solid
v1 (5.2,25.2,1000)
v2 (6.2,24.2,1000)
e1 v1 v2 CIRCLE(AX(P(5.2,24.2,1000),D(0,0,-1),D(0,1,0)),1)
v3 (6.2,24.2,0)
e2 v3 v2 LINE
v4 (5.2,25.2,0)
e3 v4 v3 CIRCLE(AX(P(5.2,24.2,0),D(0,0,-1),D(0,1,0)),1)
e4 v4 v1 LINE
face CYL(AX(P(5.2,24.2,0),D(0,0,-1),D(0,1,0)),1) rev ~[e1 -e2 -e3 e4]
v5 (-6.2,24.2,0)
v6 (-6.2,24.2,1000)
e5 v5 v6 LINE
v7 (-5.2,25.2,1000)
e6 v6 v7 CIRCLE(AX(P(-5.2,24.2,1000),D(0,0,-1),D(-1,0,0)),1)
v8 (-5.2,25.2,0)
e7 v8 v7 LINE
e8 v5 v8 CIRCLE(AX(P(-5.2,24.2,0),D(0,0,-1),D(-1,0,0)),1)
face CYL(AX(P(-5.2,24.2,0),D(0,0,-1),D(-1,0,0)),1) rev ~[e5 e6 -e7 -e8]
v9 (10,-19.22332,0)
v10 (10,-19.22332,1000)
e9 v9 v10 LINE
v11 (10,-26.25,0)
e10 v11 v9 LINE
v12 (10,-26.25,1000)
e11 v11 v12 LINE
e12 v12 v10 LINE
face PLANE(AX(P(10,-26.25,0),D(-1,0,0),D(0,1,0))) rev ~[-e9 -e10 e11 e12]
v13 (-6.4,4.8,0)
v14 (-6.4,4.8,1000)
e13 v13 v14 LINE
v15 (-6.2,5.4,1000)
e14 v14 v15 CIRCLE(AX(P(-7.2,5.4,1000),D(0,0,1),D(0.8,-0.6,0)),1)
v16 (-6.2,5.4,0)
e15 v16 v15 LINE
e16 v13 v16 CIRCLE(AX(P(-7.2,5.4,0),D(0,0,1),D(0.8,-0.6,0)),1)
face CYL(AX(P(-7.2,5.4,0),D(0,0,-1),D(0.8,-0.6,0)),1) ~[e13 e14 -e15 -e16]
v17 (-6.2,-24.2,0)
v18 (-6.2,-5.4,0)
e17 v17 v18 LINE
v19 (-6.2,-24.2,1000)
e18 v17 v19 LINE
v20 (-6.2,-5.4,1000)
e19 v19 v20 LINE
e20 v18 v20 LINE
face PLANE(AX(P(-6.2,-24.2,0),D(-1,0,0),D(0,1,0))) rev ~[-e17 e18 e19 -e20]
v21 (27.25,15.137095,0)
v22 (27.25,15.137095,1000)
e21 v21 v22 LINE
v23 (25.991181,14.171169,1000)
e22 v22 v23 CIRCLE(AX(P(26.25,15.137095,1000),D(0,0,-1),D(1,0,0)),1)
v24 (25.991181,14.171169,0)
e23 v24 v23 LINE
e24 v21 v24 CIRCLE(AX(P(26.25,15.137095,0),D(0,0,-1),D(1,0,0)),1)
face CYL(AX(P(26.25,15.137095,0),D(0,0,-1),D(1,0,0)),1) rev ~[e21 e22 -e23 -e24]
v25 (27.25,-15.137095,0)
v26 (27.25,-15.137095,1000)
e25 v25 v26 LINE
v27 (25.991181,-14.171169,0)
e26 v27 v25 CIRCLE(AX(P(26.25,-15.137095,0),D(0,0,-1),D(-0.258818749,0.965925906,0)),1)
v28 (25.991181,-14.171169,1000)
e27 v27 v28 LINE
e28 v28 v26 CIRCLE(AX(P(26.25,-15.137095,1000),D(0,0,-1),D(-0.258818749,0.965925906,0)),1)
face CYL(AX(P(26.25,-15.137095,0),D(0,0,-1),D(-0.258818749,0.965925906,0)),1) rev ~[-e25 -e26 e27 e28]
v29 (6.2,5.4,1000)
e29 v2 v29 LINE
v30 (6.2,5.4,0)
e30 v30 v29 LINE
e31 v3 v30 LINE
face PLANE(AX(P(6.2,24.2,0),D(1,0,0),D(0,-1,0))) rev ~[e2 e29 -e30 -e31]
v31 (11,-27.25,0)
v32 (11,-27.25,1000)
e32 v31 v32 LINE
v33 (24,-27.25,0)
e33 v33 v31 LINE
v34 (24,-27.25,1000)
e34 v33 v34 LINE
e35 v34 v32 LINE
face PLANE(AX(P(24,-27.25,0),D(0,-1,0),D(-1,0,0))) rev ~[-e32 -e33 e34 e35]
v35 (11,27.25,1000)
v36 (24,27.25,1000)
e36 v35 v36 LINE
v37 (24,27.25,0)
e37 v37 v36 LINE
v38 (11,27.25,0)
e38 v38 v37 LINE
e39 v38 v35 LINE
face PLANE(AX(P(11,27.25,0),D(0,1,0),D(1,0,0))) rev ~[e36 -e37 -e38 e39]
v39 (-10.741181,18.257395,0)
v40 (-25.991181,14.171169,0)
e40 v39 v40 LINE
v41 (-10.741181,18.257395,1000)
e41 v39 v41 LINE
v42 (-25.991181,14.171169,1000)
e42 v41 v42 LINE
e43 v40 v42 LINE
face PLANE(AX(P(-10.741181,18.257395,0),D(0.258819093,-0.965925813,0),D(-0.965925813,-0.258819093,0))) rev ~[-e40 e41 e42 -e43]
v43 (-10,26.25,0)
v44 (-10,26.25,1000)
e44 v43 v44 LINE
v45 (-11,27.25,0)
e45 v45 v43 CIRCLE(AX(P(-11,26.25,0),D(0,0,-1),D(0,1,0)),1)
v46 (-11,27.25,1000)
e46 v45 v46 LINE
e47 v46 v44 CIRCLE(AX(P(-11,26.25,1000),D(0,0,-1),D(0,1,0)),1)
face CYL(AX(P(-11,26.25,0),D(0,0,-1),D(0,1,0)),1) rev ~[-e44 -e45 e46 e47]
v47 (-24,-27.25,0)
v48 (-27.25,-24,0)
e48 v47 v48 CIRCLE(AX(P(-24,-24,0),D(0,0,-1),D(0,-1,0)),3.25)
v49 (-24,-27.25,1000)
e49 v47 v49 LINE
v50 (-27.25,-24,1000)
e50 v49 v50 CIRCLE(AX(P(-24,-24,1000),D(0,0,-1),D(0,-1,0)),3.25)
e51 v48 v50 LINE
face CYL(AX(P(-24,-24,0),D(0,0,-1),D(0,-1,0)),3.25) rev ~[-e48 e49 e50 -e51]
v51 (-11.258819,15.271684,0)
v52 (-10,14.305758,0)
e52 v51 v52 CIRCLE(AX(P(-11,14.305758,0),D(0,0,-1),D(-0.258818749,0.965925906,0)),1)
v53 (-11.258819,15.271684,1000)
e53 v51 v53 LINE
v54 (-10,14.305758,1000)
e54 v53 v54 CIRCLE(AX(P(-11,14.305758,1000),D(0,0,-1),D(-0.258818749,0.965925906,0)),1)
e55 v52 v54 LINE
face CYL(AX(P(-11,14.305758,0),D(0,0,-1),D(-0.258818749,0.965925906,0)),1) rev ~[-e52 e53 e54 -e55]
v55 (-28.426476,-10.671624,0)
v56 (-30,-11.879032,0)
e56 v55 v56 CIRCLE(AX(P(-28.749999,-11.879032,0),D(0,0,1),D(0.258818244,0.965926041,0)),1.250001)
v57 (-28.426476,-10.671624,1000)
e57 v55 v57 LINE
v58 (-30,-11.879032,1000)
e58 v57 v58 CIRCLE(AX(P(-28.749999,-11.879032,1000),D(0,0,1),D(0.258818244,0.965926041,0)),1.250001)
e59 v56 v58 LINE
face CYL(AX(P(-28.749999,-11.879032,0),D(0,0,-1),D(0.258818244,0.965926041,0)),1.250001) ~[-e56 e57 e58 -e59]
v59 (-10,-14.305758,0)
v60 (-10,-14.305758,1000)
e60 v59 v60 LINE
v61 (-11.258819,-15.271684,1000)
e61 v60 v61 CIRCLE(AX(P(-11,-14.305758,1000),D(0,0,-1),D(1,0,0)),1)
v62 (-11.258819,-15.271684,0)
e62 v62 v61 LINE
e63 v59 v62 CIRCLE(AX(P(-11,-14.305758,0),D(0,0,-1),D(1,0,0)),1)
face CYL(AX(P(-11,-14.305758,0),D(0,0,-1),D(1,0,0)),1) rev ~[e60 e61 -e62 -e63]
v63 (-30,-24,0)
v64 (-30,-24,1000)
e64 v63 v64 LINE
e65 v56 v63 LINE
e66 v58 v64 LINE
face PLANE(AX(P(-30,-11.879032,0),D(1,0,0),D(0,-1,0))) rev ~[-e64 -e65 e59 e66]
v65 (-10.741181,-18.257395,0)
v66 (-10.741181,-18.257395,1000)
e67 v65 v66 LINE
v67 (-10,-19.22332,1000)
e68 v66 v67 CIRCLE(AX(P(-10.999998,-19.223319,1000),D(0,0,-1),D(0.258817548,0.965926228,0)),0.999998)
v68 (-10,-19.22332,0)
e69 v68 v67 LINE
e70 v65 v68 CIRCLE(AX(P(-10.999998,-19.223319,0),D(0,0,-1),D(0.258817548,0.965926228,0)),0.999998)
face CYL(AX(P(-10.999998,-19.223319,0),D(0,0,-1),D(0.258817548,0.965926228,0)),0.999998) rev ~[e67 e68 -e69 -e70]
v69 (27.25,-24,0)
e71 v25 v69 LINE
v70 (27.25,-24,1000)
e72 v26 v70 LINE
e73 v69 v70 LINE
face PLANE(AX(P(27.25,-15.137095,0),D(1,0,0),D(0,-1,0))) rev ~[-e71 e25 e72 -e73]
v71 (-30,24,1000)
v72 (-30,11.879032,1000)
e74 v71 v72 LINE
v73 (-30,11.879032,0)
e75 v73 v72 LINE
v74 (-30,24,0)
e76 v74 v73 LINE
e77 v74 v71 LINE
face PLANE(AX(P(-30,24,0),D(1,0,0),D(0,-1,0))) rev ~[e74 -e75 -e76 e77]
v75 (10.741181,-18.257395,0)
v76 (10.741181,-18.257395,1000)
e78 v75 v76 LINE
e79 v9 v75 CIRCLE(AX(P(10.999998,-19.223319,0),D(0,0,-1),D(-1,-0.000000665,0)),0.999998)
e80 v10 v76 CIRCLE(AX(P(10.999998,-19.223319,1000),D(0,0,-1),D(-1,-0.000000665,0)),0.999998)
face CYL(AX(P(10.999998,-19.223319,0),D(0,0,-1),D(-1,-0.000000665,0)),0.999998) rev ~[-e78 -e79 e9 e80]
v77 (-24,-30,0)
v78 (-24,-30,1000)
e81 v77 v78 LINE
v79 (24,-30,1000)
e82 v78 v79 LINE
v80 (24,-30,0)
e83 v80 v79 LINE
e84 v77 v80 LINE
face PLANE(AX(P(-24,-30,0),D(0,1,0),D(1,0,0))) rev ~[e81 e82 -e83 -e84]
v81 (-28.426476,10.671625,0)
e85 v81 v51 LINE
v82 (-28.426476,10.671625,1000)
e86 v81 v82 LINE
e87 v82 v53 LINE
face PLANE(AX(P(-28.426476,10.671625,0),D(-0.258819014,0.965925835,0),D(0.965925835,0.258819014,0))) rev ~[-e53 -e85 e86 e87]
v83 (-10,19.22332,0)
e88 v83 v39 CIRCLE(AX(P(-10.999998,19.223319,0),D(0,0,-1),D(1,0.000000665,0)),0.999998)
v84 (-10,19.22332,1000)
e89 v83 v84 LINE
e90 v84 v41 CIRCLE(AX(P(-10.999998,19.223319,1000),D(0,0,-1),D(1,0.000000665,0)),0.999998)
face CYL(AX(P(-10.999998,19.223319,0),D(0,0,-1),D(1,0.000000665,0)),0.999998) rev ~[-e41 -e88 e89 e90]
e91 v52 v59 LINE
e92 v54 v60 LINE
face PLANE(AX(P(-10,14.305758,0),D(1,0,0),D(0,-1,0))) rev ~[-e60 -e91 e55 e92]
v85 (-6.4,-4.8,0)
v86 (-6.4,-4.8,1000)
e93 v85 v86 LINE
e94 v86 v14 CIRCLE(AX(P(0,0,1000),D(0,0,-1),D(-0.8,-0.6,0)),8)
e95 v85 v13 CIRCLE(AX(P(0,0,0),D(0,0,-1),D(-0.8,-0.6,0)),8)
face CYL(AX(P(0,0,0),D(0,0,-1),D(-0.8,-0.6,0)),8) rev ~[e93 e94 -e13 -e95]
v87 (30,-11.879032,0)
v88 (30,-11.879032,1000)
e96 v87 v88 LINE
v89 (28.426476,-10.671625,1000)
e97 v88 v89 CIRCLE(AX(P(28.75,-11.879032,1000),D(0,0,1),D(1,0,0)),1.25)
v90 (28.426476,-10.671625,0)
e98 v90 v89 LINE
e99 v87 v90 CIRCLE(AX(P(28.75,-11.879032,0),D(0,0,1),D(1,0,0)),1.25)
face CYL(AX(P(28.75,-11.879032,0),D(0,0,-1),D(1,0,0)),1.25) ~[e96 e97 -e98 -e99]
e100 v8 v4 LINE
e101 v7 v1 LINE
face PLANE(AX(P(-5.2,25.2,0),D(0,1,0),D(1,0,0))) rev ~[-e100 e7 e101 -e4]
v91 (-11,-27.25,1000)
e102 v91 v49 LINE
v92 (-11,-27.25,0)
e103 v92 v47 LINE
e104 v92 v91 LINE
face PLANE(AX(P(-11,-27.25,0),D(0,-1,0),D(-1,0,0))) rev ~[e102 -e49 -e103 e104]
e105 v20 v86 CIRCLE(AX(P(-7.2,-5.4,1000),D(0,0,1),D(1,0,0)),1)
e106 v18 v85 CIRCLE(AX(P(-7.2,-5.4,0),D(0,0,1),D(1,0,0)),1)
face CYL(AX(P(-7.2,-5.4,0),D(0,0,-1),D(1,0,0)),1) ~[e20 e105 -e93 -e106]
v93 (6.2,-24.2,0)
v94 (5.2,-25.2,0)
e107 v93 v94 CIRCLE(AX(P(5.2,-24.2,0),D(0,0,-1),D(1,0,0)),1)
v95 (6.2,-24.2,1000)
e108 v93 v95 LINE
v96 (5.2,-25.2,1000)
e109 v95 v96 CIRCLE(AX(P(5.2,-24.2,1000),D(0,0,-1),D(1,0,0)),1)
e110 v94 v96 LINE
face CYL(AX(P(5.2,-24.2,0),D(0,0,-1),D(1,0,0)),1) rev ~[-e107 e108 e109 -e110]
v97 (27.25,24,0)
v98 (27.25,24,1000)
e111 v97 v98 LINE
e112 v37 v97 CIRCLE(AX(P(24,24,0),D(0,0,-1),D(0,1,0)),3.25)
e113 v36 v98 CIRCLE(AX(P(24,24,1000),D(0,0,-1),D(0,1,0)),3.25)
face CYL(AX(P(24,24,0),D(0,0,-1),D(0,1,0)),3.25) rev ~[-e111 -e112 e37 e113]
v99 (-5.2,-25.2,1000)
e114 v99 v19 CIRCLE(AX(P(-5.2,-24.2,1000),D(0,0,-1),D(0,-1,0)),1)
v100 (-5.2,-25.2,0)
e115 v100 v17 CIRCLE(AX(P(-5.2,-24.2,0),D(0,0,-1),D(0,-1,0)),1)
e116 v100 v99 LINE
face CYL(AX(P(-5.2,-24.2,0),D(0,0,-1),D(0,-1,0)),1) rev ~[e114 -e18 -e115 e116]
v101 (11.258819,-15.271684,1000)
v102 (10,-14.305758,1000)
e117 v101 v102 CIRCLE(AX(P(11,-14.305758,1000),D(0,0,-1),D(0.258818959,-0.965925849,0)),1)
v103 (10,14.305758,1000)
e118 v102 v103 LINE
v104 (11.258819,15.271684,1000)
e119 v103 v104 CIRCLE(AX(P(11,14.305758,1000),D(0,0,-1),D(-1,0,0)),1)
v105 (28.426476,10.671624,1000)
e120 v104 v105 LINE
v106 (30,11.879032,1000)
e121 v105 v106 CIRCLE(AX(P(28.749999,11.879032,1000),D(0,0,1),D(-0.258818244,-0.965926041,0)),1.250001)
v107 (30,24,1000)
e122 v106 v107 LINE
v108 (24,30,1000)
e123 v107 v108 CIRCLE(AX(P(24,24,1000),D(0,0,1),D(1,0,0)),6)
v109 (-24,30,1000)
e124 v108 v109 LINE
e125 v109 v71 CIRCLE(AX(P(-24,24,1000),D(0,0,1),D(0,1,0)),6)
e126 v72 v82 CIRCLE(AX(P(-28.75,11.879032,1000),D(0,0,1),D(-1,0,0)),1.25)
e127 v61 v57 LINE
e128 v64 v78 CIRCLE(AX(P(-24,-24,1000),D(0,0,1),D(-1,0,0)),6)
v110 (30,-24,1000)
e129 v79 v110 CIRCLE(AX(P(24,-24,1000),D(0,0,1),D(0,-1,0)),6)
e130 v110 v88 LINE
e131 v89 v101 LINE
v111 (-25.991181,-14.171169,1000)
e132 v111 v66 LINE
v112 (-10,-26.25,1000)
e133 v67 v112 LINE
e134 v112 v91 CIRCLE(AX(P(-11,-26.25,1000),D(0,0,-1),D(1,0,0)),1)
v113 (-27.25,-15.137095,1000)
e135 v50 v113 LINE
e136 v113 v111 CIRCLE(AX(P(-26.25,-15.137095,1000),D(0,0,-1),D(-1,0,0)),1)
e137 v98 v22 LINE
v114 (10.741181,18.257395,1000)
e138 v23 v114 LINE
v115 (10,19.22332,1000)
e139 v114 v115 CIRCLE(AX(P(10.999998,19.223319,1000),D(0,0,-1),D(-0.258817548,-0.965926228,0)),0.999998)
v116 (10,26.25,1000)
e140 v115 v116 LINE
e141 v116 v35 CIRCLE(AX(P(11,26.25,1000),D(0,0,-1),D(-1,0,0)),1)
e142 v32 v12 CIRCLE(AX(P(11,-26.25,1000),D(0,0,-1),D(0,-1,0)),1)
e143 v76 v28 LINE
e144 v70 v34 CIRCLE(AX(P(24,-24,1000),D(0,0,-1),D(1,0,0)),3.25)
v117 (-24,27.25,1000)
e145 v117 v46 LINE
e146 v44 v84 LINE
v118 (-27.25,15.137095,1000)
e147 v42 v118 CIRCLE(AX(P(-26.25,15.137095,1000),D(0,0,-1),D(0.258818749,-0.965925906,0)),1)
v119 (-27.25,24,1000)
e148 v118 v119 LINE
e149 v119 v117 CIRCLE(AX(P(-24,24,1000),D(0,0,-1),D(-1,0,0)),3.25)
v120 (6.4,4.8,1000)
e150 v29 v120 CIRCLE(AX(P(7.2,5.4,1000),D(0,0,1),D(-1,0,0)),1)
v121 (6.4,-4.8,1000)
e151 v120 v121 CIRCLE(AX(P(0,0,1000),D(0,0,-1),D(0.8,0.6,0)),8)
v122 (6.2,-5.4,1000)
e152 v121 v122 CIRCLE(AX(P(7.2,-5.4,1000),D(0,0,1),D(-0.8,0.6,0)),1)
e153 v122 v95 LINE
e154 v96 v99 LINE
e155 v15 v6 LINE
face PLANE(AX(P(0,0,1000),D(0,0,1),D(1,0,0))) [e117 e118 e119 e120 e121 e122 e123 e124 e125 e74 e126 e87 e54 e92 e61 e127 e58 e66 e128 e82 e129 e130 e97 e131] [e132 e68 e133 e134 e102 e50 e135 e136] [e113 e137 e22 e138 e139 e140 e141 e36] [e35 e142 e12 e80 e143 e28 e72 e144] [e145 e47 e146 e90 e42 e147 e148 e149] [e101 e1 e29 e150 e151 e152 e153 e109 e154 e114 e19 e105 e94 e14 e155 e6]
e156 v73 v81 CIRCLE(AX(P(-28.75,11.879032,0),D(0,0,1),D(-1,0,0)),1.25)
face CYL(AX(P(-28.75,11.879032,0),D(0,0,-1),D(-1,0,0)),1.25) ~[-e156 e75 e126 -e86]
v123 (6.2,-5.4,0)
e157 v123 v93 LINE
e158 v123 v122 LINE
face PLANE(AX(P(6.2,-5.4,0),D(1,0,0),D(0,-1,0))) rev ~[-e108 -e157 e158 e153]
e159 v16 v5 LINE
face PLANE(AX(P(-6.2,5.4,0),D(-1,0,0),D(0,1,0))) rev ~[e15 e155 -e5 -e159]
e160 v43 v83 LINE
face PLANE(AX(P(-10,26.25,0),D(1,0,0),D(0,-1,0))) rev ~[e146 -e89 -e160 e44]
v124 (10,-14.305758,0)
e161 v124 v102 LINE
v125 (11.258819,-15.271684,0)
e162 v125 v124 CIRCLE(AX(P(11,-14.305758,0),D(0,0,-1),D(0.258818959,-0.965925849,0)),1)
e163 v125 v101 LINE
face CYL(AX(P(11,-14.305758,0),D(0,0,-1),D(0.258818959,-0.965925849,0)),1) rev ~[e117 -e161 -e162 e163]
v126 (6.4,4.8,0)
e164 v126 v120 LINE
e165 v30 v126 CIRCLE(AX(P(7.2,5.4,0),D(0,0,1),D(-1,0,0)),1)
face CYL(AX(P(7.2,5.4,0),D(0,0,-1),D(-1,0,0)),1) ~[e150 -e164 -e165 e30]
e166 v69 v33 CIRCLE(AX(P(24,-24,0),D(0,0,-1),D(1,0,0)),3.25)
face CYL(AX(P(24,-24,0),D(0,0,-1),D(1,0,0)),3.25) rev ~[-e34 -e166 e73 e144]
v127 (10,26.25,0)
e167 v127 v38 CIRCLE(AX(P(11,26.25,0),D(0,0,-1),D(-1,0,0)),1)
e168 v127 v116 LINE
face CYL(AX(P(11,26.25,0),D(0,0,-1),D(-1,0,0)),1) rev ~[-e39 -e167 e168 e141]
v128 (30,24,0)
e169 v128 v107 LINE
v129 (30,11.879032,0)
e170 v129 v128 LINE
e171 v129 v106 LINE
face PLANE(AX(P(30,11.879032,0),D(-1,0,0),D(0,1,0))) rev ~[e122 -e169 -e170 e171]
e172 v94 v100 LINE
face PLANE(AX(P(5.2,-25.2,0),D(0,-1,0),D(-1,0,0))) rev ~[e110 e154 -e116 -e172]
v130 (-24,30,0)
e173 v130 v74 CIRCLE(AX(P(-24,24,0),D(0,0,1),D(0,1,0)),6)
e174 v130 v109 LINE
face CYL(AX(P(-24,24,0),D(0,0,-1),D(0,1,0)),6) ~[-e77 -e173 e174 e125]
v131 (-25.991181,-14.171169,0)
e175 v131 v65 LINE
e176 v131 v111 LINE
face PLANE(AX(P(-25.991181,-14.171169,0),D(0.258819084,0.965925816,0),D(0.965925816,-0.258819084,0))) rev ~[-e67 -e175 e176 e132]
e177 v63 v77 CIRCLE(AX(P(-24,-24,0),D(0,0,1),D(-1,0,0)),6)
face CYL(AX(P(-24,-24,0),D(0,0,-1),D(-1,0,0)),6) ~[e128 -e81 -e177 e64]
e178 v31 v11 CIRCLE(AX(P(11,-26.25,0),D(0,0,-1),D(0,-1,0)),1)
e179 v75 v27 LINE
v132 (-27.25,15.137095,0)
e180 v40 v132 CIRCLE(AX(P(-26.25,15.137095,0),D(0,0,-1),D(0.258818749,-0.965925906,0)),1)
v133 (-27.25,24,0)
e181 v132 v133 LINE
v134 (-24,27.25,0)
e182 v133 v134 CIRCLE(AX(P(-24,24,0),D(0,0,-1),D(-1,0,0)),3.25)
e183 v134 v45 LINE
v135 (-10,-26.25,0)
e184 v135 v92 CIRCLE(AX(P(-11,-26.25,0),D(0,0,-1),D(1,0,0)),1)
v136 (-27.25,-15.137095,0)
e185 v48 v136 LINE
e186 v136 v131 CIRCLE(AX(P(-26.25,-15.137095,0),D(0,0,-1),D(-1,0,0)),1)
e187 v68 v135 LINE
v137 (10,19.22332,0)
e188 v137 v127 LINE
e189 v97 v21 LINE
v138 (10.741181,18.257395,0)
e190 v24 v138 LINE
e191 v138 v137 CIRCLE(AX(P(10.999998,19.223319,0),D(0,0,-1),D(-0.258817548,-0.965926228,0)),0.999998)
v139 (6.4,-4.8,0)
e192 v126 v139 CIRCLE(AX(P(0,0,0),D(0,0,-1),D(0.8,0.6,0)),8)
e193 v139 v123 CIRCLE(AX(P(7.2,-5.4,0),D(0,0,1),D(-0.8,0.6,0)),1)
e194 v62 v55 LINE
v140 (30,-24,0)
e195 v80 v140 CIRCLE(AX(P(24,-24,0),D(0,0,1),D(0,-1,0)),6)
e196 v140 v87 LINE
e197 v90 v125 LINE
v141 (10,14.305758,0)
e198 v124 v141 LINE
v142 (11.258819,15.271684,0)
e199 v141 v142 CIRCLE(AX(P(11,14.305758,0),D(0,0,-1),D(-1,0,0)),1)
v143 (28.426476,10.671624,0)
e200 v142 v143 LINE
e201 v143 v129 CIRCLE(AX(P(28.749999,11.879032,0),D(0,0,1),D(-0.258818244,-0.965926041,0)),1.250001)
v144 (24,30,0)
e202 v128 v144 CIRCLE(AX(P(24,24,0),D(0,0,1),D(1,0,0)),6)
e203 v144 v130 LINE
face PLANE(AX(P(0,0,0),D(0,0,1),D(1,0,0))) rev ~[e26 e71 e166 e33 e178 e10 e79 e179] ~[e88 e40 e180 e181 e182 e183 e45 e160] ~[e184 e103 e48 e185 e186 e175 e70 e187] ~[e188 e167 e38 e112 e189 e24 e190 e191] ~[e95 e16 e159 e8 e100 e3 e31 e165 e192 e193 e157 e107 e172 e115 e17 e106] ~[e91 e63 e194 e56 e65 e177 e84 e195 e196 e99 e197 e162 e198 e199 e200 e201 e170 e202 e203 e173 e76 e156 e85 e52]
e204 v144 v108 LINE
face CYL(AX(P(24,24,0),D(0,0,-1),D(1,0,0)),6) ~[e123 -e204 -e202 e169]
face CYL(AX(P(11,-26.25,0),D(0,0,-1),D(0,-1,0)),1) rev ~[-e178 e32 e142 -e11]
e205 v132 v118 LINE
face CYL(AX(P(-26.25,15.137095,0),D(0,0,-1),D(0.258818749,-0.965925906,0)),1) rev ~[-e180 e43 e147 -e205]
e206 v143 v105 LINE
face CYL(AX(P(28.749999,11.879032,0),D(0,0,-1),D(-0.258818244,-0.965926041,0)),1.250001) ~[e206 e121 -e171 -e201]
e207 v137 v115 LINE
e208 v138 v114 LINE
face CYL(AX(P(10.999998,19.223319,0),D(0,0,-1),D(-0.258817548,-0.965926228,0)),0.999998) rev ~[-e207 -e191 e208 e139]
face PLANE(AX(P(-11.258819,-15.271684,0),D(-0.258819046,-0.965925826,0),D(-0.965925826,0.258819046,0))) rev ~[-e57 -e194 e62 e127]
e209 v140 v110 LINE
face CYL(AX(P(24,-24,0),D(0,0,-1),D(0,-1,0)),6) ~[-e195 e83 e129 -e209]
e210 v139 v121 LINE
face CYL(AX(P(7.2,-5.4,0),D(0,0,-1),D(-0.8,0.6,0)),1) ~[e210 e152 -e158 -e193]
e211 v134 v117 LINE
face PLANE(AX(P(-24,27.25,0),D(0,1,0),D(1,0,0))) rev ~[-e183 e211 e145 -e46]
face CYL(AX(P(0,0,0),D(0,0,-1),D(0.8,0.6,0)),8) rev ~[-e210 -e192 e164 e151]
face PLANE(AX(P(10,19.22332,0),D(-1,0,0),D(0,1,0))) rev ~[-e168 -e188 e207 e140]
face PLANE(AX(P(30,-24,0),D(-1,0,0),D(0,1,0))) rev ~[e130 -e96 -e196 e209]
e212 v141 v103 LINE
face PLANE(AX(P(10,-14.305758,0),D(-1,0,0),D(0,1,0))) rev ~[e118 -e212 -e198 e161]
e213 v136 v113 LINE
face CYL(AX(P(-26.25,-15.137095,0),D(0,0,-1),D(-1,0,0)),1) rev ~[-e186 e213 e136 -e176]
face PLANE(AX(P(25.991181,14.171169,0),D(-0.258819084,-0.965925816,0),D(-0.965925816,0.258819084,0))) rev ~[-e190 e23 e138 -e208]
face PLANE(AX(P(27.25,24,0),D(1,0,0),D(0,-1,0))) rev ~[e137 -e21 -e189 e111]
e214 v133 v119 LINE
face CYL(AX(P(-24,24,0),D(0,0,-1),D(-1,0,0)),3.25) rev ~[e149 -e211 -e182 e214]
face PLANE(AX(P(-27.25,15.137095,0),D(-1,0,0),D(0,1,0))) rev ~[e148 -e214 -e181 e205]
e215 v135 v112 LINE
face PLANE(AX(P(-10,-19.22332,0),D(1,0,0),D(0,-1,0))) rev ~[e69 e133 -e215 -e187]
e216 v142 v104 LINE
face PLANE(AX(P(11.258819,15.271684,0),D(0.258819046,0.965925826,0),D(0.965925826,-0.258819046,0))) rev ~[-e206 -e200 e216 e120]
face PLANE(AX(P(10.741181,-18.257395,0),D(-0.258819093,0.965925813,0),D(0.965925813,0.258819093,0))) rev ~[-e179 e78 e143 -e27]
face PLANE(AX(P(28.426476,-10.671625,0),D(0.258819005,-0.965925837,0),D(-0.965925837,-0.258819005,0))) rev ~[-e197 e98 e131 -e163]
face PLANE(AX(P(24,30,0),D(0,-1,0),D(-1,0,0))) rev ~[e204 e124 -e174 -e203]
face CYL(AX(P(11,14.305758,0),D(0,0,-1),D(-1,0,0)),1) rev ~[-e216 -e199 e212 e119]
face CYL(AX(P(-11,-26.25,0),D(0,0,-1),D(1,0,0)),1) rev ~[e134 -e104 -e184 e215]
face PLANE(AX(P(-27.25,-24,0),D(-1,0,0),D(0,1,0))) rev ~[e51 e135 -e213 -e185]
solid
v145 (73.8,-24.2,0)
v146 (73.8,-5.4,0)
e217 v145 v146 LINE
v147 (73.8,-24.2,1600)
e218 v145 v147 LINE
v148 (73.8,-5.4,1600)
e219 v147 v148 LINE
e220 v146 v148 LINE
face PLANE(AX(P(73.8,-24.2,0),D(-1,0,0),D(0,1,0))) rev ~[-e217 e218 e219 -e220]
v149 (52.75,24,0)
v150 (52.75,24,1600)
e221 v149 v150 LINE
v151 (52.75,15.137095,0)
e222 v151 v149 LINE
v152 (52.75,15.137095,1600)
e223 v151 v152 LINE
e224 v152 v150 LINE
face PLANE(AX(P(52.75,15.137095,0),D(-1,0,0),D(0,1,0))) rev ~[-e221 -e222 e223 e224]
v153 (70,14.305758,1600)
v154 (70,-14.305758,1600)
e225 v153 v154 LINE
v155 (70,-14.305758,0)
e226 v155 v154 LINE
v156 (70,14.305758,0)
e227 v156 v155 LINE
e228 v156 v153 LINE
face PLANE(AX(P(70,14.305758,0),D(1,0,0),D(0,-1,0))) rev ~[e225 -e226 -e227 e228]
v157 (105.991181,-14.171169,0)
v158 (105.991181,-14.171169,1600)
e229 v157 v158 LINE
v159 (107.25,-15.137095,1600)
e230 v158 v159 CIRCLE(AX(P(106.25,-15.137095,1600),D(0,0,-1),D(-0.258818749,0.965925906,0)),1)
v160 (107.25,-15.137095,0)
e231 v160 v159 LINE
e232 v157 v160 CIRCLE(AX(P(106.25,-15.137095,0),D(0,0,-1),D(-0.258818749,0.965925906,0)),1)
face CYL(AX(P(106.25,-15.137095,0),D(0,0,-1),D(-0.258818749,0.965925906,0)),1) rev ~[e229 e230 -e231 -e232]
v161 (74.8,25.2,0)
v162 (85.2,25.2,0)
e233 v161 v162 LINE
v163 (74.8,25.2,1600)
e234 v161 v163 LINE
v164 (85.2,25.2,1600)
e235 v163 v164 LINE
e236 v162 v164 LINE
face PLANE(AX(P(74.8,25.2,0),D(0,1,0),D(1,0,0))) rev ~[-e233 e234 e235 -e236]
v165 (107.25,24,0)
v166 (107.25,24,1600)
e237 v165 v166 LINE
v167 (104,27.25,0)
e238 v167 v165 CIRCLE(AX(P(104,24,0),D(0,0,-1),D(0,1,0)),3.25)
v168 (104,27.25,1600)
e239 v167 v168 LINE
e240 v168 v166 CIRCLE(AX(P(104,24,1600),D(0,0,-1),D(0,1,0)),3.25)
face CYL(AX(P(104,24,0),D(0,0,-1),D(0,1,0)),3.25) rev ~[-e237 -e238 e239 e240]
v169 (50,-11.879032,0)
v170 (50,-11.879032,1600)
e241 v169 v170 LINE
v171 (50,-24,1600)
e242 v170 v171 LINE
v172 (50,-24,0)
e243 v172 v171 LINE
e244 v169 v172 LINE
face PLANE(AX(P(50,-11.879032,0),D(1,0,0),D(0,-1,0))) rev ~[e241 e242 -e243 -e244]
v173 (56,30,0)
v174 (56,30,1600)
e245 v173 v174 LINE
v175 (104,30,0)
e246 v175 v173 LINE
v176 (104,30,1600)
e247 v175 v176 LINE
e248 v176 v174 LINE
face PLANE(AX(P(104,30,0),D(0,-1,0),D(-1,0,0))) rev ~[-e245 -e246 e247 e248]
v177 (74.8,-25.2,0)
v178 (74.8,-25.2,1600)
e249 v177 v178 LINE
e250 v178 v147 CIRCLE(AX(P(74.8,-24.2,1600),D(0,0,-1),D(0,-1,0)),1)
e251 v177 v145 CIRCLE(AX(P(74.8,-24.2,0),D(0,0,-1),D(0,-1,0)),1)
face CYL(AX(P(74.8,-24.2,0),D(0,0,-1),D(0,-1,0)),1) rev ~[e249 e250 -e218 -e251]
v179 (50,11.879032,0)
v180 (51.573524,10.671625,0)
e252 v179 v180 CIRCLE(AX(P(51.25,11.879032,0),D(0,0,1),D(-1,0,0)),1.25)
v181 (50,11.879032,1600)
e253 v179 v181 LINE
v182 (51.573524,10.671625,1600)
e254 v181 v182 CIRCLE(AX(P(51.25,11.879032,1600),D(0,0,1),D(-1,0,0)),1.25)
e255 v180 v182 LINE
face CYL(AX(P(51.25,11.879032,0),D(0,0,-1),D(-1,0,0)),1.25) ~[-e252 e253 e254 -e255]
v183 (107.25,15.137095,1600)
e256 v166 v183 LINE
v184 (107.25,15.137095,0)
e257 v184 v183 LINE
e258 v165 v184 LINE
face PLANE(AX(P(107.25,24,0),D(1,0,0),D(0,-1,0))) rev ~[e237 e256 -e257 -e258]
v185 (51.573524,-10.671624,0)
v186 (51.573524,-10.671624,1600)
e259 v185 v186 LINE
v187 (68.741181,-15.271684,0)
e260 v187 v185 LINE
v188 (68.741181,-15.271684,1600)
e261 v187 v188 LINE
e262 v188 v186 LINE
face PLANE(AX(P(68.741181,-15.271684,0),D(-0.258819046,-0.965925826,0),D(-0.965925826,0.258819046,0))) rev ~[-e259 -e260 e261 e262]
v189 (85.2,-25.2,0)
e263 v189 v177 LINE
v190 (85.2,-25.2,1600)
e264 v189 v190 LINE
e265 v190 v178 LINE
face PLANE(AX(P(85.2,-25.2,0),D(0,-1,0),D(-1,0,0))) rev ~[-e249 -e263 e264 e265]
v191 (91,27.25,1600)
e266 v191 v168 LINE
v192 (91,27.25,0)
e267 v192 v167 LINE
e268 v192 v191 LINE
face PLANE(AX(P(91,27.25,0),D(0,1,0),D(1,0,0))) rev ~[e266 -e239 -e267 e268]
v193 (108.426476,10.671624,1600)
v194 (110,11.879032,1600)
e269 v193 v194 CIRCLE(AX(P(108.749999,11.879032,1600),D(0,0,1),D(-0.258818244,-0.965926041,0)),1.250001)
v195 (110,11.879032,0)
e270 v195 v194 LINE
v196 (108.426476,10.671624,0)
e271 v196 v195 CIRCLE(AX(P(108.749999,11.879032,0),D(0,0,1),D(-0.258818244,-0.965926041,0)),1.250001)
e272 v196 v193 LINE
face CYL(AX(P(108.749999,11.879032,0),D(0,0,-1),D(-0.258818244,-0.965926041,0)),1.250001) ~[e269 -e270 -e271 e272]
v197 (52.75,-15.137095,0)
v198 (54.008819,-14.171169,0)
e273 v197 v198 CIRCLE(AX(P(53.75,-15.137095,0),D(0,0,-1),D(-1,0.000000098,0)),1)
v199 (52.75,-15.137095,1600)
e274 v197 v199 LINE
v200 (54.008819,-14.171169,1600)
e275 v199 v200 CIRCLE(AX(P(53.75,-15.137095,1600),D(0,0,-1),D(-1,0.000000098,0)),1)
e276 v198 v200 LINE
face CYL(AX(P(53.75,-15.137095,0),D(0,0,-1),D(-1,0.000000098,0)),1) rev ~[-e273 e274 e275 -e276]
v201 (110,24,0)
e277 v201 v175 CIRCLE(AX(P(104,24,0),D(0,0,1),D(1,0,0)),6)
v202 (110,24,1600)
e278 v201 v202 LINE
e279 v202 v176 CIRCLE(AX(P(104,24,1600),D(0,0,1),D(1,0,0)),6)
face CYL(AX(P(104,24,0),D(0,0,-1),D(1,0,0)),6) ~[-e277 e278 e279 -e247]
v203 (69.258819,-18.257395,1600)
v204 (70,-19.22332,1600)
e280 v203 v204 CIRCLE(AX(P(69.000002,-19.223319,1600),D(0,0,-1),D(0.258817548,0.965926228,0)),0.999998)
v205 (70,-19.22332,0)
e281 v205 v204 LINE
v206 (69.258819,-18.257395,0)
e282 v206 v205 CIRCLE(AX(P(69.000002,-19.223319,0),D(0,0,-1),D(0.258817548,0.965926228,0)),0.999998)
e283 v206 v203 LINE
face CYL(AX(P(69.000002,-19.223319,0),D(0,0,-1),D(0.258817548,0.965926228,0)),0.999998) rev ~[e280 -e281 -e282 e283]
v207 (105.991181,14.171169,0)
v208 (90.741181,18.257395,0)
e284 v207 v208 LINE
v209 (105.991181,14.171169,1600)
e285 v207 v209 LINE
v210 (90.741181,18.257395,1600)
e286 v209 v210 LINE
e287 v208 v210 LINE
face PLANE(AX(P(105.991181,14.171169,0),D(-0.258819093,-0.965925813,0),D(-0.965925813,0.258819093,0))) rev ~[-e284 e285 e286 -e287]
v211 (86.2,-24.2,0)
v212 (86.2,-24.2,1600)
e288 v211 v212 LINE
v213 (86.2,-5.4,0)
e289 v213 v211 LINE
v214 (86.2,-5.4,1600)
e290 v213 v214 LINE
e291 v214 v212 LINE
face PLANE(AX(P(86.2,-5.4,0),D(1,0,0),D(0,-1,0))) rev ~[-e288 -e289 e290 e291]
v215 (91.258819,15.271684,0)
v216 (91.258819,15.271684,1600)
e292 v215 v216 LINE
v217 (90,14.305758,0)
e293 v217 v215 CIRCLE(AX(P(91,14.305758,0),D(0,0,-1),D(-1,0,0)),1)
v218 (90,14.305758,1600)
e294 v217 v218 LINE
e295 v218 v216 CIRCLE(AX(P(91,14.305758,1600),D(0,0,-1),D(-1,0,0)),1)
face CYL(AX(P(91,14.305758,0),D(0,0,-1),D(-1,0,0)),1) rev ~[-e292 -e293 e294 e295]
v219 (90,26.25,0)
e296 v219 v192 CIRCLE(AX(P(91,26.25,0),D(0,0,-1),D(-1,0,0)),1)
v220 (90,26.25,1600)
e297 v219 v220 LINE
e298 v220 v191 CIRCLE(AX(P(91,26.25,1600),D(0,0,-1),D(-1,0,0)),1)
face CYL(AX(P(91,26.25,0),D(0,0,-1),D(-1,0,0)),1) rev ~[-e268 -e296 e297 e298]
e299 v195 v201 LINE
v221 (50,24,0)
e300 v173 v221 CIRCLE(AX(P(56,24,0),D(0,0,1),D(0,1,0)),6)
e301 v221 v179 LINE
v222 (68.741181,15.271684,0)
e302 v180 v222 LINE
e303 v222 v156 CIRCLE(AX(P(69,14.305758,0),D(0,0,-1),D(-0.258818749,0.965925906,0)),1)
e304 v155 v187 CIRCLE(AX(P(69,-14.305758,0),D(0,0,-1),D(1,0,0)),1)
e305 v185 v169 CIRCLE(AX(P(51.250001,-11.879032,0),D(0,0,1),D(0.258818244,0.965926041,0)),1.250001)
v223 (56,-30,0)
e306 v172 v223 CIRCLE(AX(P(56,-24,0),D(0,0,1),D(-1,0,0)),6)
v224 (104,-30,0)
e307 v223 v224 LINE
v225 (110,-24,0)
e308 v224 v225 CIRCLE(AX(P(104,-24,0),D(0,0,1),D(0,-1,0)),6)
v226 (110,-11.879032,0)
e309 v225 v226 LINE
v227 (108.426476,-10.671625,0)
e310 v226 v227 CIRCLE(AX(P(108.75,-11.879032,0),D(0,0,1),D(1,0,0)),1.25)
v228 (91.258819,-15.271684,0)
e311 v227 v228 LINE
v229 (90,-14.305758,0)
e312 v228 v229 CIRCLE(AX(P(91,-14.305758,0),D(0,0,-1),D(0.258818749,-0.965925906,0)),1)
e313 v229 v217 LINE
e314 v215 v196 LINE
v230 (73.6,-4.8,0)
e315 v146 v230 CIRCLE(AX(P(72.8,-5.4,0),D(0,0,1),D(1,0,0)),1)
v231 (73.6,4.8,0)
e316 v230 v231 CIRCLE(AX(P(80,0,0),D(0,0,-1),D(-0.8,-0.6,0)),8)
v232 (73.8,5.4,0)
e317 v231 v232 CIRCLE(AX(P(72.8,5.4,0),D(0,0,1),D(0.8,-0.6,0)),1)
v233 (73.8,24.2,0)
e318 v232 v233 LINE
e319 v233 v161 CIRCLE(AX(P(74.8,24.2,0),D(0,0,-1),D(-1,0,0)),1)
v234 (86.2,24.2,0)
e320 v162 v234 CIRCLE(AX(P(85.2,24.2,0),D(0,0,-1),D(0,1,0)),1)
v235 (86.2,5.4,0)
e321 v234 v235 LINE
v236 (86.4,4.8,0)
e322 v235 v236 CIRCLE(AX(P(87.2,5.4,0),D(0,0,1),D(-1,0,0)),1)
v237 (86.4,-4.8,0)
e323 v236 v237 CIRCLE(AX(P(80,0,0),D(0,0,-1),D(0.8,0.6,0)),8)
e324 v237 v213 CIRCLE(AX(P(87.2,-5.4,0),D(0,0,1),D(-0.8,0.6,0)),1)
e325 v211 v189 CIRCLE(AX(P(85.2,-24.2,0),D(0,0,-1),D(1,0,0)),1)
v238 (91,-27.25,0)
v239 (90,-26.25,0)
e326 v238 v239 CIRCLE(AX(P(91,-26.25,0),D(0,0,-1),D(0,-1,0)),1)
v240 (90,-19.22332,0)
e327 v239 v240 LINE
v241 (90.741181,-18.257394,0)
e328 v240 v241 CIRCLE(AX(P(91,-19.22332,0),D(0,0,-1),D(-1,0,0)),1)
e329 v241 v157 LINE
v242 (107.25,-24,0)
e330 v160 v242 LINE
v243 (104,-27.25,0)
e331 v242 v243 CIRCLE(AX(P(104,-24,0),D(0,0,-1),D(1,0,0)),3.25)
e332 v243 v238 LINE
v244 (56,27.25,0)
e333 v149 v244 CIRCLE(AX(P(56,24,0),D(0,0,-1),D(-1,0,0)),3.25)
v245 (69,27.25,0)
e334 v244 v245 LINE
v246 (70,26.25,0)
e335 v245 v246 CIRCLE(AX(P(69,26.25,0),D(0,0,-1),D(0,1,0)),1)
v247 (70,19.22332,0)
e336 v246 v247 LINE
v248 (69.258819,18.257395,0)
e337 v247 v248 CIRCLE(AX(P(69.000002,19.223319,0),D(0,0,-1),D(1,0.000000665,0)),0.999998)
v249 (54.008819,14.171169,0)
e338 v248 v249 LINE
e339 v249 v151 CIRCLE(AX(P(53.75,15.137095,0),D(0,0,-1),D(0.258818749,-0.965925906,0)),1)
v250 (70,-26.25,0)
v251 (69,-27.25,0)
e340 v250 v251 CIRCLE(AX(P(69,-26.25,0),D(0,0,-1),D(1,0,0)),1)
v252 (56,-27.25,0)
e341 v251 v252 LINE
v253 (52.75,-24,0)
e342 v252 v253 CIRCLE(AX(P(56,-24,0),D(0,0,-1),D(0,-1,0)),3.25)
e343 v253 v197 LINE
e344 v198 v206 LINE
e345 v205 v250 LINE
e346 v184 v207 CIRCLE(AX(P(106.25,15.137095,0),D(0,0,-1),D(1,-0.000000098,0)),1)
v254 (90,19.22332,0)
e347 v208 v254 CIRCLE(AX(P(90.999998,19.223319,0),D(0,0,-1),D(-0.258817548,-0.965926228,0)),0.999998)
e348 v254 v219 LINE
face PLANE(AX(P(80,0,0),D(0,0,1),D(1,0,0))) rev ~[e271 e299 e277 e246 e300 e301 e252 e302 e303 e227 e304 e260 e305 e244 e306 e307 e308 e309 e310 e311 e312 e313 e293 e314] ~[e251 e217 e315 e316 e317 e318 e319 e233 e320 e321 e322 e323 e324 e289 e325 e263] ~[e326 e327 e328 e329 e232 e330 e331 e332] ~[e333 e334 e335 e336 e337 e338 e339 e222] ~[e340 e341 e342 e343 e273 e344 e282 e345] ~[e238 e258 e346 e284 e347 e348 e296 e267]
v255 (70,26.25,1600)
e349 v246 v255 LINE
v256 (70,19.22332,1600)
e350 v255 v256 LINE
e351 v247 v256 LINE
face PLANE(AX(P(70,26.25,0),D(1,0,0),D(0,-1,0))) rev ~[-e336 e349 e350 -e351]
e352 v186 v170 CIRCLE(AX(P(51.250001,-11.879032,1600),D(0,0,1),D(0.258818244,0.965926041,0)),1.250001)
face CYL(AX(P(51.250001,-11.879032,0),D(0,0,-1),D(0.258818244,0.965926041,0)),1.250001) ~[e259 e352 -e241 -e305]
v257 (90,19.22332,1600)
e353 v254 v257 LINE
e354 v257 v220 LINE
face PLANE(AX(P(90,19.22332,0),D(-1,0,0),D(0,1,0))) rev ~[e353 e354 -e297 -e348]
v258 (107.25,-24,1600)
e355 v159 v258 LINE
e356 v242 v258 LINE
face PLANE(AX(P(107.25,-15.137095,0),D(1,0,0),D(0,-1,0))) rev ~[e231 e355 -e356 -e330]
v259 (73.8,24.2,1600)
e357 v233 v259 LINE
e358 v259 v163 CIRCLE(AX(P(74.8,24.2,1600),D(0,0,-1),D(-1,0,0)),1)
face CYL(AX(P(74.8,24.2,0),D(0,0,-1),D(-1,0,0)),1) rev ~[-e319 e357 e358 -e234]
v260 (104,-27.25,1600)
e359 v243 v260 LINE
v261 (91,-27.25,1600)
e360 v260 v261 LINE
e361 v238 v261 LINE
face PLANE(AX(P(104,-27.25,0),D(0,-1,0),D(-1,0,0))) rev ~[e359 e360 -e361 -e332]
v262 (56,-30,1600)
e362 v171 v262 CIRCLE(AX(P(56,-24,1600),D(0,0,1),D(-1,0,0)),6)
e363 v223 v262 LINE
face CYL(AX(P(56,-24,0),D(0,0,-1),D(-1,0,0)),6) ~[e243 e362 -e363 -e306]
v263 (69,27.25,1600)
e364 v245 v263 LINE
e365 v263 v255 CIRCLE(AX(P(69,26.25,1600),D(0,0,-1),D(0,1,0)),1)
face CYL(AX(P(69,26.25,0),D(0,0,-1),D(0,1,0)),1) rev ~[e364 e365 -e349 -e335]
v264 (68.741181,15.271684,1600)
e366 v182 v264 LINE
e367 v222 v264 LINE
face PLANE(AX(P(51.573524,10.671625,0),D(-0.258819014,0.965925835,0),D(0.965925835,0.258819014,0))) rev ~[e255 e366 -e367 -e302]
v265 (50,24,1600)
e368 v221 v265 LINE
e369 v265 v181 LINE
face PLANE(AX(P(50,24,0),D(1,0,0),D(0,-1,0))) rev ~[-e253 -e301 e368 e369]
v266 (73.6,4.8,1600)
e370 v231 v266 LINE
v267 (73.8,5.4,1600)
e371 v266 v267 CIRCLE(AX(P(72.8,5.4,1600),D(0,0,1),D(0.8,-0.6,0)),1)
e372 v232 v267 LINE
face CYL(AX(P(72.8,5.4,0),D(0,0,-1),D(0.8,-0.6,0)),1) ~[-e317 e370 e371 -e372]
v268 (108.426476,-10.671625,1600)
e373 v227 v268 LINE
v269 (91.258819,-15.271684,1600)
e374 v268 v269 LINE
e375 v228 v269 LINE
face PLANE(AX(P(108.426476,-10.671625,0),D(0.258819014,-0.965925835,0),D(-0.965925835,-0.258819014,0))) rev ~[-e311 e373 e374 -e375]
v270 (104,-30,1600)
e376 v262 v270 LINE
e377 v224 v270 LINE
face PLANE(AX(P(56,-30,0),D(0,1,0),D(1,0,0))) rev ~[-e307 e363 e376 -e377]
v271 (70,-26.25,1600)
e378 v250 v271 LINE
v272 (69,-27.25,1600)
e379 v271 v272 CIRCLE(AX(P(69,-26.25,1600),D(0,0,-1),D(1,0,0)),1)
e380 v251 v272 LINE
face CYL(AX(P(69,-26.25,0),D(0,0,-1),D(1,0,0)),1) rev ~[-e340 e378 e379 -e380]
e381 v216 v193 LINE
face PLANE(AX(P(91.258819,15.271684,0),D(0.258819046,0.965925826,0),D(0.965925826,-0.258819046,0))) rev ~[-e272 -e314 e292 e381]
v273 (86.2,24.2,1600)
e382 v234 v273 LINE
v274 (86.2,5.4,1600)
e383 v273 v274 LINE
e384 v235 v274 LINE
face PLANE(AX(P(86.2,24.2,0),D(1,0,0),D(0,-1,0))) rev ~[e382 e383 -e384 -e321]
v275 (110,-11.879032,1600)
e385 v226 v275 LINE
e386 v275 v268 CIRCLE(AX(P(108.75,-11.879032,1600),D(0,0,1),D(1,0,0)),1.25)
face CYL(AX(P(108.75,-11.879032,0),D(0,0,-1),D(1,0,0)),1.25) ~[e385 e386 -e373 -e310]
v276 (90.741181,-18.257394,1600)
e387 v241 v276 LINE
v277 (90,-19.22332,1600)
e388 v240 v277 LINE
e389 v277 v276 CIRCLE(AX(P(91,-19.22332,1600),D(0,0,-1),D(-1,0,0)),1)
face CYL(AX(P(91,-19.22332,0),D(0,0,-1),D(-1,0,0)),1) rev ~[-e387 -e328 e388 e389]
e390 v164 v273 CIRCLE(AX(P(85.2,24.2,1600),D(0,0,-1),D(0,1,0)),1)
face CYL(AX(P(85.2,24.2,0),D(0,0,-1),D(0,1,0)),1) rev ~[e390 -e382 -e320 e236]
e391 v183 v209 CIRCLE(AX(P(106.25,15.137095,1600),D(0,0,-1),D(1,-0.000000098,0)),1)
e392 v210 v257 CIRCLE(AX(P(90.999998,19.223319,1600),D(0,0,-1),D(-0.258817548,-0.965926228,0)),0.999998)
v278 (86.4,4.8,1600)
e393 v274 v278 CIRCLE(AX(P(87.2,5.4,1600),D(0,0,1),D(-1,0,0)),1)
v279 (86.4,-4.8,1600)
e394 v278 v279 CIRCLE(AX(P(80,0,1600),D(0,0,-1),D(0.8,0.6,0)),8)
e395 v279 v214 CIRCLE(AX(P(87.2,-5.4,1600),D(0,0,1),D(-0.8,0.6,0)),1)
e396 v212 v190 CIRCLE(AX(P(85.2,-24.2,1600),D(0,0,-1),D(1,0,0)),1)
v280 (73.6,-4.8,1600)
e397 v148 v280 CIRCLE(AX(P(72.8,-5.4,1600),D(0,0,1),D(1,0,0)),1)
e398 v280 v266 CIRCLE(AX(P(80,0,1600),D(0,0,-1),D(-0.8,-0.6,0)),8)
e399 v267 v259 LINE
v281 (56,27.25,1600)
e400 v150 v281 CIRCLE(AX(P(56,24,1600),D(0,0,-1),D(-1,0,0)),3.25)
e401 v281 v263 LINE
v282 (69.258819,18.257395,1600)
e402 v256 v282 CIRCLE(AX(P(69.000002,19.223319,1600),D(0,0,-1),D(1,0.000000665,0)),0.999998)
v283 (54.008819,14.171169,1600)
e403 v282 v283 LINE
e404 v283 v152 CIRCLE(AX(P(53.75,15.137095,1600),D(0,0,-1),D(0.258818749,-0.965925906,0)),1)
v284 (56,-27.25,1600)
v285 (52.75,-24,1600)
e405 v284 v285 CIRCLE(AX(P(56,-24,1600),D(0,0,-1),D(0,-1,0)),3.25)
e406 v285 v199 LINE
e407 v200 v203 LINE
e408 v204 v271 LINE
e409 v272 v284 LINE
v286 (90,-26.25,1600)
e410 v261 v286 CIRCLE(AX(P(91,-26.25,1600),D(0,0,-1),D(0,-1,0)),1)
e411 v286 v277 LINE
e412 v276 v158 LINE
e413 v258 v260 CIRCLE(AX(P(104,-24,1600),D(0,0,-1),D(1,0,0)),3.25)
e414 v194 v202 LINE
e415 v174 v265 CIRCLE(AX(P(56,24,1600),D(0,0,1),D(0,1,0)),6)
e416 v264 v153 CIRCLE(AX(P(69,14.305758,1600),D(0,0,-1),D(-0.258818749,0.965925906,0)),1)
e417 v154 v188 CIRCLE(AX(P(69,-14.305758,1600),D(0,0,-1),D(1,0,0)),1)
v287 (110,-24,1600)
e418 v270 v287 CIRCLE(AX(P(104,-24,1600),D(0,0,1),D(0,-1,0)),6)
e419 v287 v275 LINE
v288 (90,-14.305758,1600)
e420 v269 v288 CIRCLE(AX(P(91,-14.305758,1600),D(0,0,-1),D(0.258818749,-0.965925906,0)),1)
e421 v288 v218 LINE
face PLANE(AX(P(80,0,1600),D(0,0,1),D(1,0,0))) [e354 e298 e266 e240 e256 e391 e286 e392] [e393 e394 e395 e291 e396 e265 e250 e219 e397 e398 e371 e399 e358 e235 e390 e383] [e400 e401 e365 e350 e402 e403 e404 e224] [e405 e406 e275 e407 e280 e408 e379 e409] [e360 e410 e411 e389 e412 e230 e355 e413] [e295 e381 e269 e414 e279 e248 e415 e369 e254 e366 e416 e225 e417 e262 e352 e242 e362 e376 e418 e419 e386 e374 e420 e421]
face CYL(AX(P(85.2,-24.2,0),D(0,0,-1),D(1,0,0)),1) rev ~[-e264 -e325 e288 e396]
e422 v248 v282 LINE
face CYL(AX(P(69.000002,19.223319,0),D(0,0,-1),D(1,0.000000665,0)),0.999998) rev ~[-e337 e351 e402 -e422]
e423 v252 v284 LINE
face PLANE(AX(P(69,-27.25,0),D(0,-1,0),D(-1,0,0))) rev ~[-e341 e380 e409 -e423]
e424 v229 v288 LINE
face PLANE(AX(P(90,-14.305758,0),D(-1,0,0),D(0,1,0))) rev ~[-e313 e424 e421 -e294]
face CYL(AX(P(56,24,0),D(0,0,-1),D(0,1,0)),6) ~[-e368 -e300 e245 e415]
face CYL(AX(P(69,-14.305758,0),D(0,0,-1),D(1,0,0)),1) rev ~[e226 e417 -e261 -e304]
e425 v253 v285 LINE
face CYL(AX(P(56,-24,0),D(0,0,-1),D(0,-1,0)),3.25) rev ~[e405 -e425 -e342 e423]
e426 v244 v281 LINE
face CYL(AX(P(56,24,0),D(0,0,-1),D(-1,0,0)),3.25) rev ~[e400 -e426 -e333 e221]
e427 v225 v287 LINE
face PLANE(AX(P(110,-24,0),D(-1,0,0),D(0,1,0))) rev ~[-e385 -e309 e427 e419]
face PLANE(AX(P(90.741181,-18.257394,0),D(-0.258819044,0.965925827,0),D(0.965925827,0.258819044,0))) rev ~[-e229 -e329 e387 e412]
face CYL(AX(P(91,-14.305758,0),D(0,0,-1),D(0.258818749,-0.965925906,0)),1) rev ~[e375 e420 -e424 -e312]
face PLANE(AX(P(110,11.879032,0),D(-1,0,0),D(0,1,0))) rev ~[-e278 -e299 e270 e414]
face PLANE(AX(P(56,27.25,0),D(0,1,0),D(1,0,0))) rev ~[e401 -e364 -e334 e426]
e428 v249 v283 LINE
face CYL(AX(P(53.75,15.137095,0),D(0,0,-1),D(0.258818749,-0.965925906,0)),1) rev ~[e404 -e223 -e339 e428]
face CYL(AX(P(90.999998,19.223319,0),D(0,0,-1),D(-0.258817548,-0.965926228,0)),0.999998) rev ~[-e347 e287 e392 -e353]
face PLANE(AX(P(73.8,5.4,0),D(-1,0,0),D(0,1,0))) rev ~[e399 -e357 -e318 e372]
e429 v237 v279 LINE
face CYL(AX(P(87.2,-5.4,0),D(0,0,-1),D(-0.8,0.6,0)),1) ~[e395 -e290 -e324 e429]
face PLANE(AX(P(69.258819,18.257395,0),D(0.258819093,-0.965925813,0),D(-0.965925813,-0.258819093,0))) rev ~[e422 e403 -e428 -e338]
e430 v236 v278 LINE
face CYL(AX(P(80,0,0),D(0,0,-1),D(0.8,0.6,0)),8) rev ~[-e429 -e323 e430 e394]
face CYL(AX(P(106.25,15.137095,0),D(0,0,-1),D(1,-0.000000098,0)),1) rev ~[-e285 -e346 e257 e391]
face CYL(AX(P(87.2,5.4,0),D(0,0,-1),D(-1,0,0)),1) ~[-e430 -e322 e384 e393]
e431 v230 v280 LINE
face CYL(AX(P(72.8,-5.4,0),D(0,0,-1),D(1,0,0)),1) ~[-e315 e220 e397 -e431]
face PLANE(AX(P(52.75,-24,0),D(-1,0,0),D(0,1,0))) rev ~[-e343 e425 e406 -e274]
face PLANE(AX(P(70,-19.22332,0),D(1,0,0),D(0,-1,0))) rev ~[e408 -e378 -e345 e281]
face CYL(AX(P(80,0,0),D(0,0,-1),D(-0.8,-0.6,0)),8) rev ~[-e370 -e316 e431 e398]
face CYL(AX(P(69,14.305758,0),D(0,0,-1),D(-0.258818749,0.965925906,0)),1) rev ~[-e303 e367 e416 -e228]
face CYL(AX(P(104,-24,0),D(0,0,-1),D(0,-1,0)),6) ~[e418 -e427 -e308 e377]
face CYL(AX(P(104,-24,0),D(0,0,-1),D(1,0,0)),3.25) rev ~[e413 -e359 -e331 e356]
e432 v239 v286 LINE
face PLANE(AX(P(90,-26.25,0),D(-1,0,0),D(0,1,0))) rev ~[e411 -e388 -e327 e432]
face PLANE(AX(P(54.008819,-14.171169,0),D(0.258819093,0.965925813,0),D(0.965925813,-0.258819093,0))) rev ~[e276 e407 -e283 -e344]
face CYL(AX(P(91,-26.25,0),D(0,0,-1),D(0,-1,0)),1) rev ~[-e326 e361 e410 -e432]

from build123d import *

# Parameters (mm, degrees)
F1_DEPTH = 1000
F2_DEPTH = 1600


# Not quite as in the source:
# - ends of sketch curves that miss each other by under 0.0002 mm in the source are joined


with BuildPart() as f1:
    # F0 (on Top) → F1 (new body)
    with BuildSketch(Plane.XY):
        with BuildLine():
            ThreePointArc((11.2588189596, -15.2716838492), (10.3912385359, -15.0991113133), (10, -14.305758))
            Line((10, -14.305758), (10, 14.305758))
            ThreePointArc((10, 14.305758), (10.3912385359, 15.0991113133), (11.2588189596, 15.2716838492))
            Line((11.2588189596, 15.2716838492), (28.426476, 10.671624))
            ThreePointArc((28.426476, 10.671624), (29.5109517857, 10.8873403242), (30, 11.879032))
            Line((30, 11.879032), (30, 24))
            ThreePointArc((30, 24), (28.2426406871, 28.2426406871), (24, 30))
            Line((24, 30), (-24, 30))
            ThreePointArc((-24, 30), (-28.2426406871, 28.2426406871), (-30, 24))
            Line((-30, 24), (-30, 11.879032))
            ThreePointArc((-30, 11.879032), (-29.5109517857, 10.8873403242), (-28.4264761923, 10.6716247175))
            Line((-28.4264761923, 10.6716247175), (-11.258819, 15.271684))
            ThreePointArc((-11.258819, 15.271684), (-10.3912385359, 15.0991113133), (-10, 14.305758))
            Line((-10, 14.305758), (-10, -14.305758))
            ThreePointArc((-10, -14.305758), (-10.3912385359, -15.0991113133), (-11.2588189596, -15.2716838492))
            Line((-11.2588189596, -15.2716838492), (-28.426476, -10.671624))
            ThreePointArc((-28.426476, -10.671624), (-29.5109517857, -10.8873403242), (-30, -11.879032))
            Line((-30, -11.879032), (-30, -24))
            ThreePointArc((-30, -24), (-28.2426406871, -28.2426406871), (-24, -30))
            Line((-24, -30), (24, -30))
            ThreePointArc((24, -30), (28.2426406871, -28.2426406871), (30, -24))
            Line((30, -24), (30, -11.879032))
            ThreePointArc((30, -11.879032), (29.5109517857, -10.8873403242), (28.4264761923, -10.6716247175))
            Line((28.4264761923, -10.6716247175), (11.2588189596, -15.2716838492))
        make_face()
        with BuildLine():
            Line((-11, -27.25), (-24, -27.25))
            ThreePointArc((-24, -27.25), (-26.2980970389, -26.2980970389), (-27.25, -24))
            Line((-27.25, -24), (-27.25, -15.137095))
            ThreePointArc((-27.25, -15.137095), (-26.8587614641, -14.3437416867), (-25.9911810404, -14.1711691508))
            Line((-25.9911810404, -14.1711691508), (-10.741181, -18.257395))
            ThreePointArc((-10.741181, -18.257395), (-10.2066466079, -18.6145586385), (-10, -19.22332))
            Line((-10, -19.22332), (-10, -26.25))
            ThreePointArc((-10, -26.25), (-10.2928932188, -26.9571067812), (-11, -27.25))
        make_face(mode=Mode.SUBTRACT)
        with BuildLine():
            Line((10.741181, -18.257395), (25.991181, -14.171169))
            ThreePointArc((25.991181, -14.171169), (26.8587614641, -14.3437416867), (27.25, -15.137095))
            Line((27.25, -15.137095), (27.25, -24))
            ThreePointArc((27.25, -24), (26.2980970389, -26.2980970389), (24, -27.25))
            Line((24, -27.25), (11, -27.25))
            ThreePointArc((11, -27.25), (10.2928932188, -26.9571067812), (10, -26.25))
            Line((10, -26.25), (10, -19.22332))
            ThreePointArc((10, -19.22332), (10.2066466079, -18.6145586385), (10.741181, -18.257395))
        make_face(mode=Mode.SUBTRACT)
        with BuildLine():
            Line((5.2, -25.2), (-5.2, -25.2))
            ThreePointArc((-5.2, -25.2), (-5.9071067812, -24.9071067812), (-6.2, -24.2))
            Line((-6.2, -24.2), (-6.2, -5.4))
            ThreePointArc((-6.2, -5.4), (-6.2513167019, -5.083772234), (-6.4, -4.8))
            ThreePointArc((-6.4, -4.8), (-8, 0), (-6.4, 4.8))
            ThreePointArc((-6.4, 4.8), (-6.2513167019, 5.083772234), (-6.2, 5.4))
            Line((-6.2, 5.4), (-6.2, 24.2))
            ThreePointArc((-6.2, 24.2), (-5.9071067812, 24.9071067812), (-5.2, 25.2))
            Line((-5.2, 25.2), (5.2, 25.2))
            ThreePointArc((5.2, 25.2), (5.9071067812, 24.9071067812), (6.2, 24.2))
            Line((6.2, 24.2), (6.2, 5.4))
            ThreePointArc((6.2, 5.4), (6.2513167019, 5.083772234), (6.4, 4.8))
            ThreePointArc((6.4, 4.8), (8, 0), (6.4, -4.8))
            ThreePointArc((6.4, -4.8), (6.2513167019, -5.083772234), (6.2, -5.4))
            Line((6.2, -5.4), (6.2, -24.2))
            ThreePointArc((6.2, -24.2), (5.9071067812, -24.9071067812), (5.2, -25.2))
        make_face(mode=Mode.SUBTRACT)
        with BuildLine():
            Line((-10.741181, 18.257395), (-25.991181, 14.171169))
            ThreePointArc((-25.991181, 14.171169), (-26.8587614641, 14.3437416867), (-27.25, 15.137095))
            Line((-27.25, 15.137095), (-27.25, 24))
            ThreePointArc((-27.25, 24), (-26.2980970389, 26.2980970389), (-24, 27.25))
            Line((-24, 27.25), (-11, 27.25))
            ThreePointArc((-11, 27.25), (-10.2928932188, 26.9571067812), (-10, 26.25))
            Line((-10, 26.25), (-10, 19.22332))
            ThreePointArc((-10, 19.22332), (-10.2066466079, 18.6145586385), (-10.741181, 18.257395))
        make_face(mode=Mode.SUBTRACT)
        with BuildLine():
            Line((11, 27.25), (24, 27.25))
            ThreePointArc((24, 27.25), (26.2980970389, 26.2980970389), (27.25, 24))
            Line((27.25, 24), (27.25, 15.137095))
            ThreePointArc((27.25, 15.137095), (26.8587614641, 14.3437416867), (25.9911810404, 14.1711691508))
            Line((25.9911810404, 14.1711691508), (10.741181, 18.257395))
            ThreePointArc((10.741181, 18.257395), (10.2066466079, 18.6145586385), (10, 19.22332))
            Line((10, 19.22332), (10, 26.25))
            ThreePointArc((10, 26.25), (10.2928932188, 26.9571067812), (11, 27.25))
        make_face(mode=Mode.SUBTRACT)
    extrude(amount=F1_DEPTH)


with BuildPart() as f2:
    # F0 (on Top) → F2 (new body)
    with BuildSketch(Plane.XY):
        with BuildLine():
            ThreePointArc((50, -24), (51.7573593129, -28.2426406871), (56, -30))
            Line((56, -30), (104, -30))
            ThreePointArc((104, -30), (108.2426406871, -28.2426406871), (110, -24))
            Line((110, -24), (110, -11.879032))
            ThreePointArc((110, -11.879032), (109.5109517857, -10.8873403242), (108.4264761923, -10.6716247175))
            Line((108.4264761923, -10.6716247175), (91.258819, -15.271684))
            ThreePointArc((91.258819, -15.271684), (90.3912385359, -15.0991113133), (90, -14.305758))
            Line((90, -14.305758), (90, 14.305758))
            ThreePointArc((90, 14.305758), (90.3912385359, 15.0991113133), (91.2588189596, 15.2716838492))
            Line((91.2588189596, 15.2716838492), (108.426476, 10.671624))
            ThreePointArc((108.426476, 10.671624), (109.5109517857, 10.8873403242), (110, 11.879032))
            Line((110, 11.879032), (110, 24))
            ThreePointArc((110, 24), (108.2426406871, 28.2426406871), (104, 30))
            Line((104, 30), (56, 30))
            ThreePointArc((56, 30), (51.7573593129, 28.2426406871), (50, 24))
            Line((50, 24), (50, 11.879032))
            ThreePointArc((50, 11.879032), (50.4890482143, 10.8873403242), (51.5735238077, 10.6716247175))
            Line((51.5735238077, 10.6716247175), (68.741181, 15.271684))
            ThreePointArc((68.741181, 15.271684), (69.6087614641, 15.0991113133), (70, 14.305758))
            Line((70, 14.305758), (70, -14.305758))
            ThreePointArc((70, -14.305758), (69.6087614641, -15.0991113133), (68.7411810404, -15.2716838492))
            Line((68.7411810404, -15.2716838492), (51.573524, -10.671624))
            ThreePointArc((51.573524, -10.671624), (50.4890482143, -10.8873403242), (50, -11.879032))
            Line((50, -11.879032), (50, -24))
        make_face()
        with BuildLine():
            Line((54.008819, -14.171169), (69.258819, -18.257395))
            ThreePointArc((69.258819, -18.257395), (69.7933533921, -18.6145586385), (70, -19.22332))
            Line((70, -19.22332), (70, -26.25))
            ThreePointArc((70, -26.25), (69.7071067812, -26.9571067812), (69, -27.25))
            Line((69, -27.25), (56, -27.25))
            ThreePointArc((56, -27.25), (53.7019029611, -26.2980970389), (52.75, -24))
            Line((52.75, -24), (52.75, -15.137095))
            ThreePointArc((52.75, -15.137095), (53.1412385359, -14.3437416867), (54.008819, -14.171169))
        make_face(mode=Mode.SUBTRACT)
        with BuildLine():
            Line((104, -27.25), (91, -27.25))
            ThreePointArc((91, -27.25), (90.2928932188, -26.9571067812), (90, -26.25))
            Line((90, -26.25), (90, -19.22332))
            ThreePointArc((90, -19.22332), (90.2066466079, -18.6145586385), (90.7411807904, -18.2573942178))
            Line((90.7411807904, -18.2573942178), (105.991181, -14.171169))
            ThreePointArc((105.991181, -14.171169), (106.8587614641, -14.3437416867), (107.25, -15.137095))
            Line((107.25, -15.137095), (107.25, -24))
            ThreePointArc((107.25, -24), (106.2980970389, -26.2980970389), (104, -27.25))
        make_face(mode=Mode.SUBTRACT)
        with BuildLine():
            Line((86.2, 24.2), (86.2, 5.4))
            ThreePointArc((86.2, 5.4), (86.2513167019, 5.083772234), (86.4, 4.8))
            ThreePointArc((86.4, 4.8), (88, 0), (86.4, -4.8))
            ThreePointArc((86.4, -4.8), (86.2513167019, -5.083772234), (86.2, -5.4))
            Line((86.2, -5.4), (86.2, -24.2))
            ThreePointArc((86.2, -24.2), (85.9071067812, -24.9071067812), (85.2, -25.2))
            Line((85.2, -25.2), (74.8, -25.2))
            ThreePointArc((74.8, -25.2), (74.0928932188, -24.9071067812), (73.8, -24.2))
            Line((73.8, -24.2), (73.8, -5.4))
            ThreePointArc((73.8, -5.4), (73.7486832981, -5.083772234), (73.6, -4.8))
            ThreePointArc((73.6, -4.8), (72, 0), (73.6, 4.8))
            ThreePointArc((73.6, 4.8), (73.7486832981, 5.083772234), (73.8, 5.4))
            Line((73.8, 5.4), (73.8, 24.2))
            ThreePointArc((73.8, 24.2), (74.0928932188, 24.9071067812), (74.8, 25.2))
            Line((74.8, 25.2), (85.2, 25.2))
            ThreePointArc((85.2, 25.2), (85.9071067812, 24.9071067812), (86.2, 24.2))
        make_face(mode=Mode.SUBTRACT)
        with BuildLine():
            Line((69.258819, 18.257395), (54.008819, 14.171169))
            ThreePointArc((54.008819, 14.171169), (53.1412385359, 14.3437416867), (52.75, 15.137095))
            Line((52.75, 15.137095), (52.75, 24))
            ThreePointArc((52.75, 24), (53.7019029611, 26.2980970389), (56, 27.25))
            Line((56, 27.25), (69, 27.25))
            ThreePointArc((69, 27.25), (69.7071067812, 26.9571067812), (70, 26.25))
            Line((70, 26.25), (70, 19.22332))
            ThreePointArc((70, 19.22332), (69.7933533921, 18.6145586385), (69.258819, 18.257395))
        make_face(mode=Mode.SUBTRACT)
        with BuildLine():
            Line((105.991181, 14.171169), (90.741181, 18.257395))
            ThreePointArc((90.741181, 18.257395), (90.2066466079, 18.6145586385), (90, 19.22332))
            Line((90, 19.22332), (90, 26.25))
            ThreePointArc((90, 26.25), (90.2928932188, 26.9571067812), (91, 27.25))
            Line((91, 27.25), (104, 27.25))
            ThreePointArc((104, 27.25), (106.2980970389, 26.2980970389), (107.25, 24))
            Line((107.25, 24), (107.25, 15.137095))
            ThreePointArc((107.25, 15.137095), (106.8587614641, 14.3437416867), (105.991181, 14.171169))
        make_face(mode=Mode.SUBTRACT)
    extrude(amount=F2_DEPTH)


solid = Compound([f1.part, f2.part])
